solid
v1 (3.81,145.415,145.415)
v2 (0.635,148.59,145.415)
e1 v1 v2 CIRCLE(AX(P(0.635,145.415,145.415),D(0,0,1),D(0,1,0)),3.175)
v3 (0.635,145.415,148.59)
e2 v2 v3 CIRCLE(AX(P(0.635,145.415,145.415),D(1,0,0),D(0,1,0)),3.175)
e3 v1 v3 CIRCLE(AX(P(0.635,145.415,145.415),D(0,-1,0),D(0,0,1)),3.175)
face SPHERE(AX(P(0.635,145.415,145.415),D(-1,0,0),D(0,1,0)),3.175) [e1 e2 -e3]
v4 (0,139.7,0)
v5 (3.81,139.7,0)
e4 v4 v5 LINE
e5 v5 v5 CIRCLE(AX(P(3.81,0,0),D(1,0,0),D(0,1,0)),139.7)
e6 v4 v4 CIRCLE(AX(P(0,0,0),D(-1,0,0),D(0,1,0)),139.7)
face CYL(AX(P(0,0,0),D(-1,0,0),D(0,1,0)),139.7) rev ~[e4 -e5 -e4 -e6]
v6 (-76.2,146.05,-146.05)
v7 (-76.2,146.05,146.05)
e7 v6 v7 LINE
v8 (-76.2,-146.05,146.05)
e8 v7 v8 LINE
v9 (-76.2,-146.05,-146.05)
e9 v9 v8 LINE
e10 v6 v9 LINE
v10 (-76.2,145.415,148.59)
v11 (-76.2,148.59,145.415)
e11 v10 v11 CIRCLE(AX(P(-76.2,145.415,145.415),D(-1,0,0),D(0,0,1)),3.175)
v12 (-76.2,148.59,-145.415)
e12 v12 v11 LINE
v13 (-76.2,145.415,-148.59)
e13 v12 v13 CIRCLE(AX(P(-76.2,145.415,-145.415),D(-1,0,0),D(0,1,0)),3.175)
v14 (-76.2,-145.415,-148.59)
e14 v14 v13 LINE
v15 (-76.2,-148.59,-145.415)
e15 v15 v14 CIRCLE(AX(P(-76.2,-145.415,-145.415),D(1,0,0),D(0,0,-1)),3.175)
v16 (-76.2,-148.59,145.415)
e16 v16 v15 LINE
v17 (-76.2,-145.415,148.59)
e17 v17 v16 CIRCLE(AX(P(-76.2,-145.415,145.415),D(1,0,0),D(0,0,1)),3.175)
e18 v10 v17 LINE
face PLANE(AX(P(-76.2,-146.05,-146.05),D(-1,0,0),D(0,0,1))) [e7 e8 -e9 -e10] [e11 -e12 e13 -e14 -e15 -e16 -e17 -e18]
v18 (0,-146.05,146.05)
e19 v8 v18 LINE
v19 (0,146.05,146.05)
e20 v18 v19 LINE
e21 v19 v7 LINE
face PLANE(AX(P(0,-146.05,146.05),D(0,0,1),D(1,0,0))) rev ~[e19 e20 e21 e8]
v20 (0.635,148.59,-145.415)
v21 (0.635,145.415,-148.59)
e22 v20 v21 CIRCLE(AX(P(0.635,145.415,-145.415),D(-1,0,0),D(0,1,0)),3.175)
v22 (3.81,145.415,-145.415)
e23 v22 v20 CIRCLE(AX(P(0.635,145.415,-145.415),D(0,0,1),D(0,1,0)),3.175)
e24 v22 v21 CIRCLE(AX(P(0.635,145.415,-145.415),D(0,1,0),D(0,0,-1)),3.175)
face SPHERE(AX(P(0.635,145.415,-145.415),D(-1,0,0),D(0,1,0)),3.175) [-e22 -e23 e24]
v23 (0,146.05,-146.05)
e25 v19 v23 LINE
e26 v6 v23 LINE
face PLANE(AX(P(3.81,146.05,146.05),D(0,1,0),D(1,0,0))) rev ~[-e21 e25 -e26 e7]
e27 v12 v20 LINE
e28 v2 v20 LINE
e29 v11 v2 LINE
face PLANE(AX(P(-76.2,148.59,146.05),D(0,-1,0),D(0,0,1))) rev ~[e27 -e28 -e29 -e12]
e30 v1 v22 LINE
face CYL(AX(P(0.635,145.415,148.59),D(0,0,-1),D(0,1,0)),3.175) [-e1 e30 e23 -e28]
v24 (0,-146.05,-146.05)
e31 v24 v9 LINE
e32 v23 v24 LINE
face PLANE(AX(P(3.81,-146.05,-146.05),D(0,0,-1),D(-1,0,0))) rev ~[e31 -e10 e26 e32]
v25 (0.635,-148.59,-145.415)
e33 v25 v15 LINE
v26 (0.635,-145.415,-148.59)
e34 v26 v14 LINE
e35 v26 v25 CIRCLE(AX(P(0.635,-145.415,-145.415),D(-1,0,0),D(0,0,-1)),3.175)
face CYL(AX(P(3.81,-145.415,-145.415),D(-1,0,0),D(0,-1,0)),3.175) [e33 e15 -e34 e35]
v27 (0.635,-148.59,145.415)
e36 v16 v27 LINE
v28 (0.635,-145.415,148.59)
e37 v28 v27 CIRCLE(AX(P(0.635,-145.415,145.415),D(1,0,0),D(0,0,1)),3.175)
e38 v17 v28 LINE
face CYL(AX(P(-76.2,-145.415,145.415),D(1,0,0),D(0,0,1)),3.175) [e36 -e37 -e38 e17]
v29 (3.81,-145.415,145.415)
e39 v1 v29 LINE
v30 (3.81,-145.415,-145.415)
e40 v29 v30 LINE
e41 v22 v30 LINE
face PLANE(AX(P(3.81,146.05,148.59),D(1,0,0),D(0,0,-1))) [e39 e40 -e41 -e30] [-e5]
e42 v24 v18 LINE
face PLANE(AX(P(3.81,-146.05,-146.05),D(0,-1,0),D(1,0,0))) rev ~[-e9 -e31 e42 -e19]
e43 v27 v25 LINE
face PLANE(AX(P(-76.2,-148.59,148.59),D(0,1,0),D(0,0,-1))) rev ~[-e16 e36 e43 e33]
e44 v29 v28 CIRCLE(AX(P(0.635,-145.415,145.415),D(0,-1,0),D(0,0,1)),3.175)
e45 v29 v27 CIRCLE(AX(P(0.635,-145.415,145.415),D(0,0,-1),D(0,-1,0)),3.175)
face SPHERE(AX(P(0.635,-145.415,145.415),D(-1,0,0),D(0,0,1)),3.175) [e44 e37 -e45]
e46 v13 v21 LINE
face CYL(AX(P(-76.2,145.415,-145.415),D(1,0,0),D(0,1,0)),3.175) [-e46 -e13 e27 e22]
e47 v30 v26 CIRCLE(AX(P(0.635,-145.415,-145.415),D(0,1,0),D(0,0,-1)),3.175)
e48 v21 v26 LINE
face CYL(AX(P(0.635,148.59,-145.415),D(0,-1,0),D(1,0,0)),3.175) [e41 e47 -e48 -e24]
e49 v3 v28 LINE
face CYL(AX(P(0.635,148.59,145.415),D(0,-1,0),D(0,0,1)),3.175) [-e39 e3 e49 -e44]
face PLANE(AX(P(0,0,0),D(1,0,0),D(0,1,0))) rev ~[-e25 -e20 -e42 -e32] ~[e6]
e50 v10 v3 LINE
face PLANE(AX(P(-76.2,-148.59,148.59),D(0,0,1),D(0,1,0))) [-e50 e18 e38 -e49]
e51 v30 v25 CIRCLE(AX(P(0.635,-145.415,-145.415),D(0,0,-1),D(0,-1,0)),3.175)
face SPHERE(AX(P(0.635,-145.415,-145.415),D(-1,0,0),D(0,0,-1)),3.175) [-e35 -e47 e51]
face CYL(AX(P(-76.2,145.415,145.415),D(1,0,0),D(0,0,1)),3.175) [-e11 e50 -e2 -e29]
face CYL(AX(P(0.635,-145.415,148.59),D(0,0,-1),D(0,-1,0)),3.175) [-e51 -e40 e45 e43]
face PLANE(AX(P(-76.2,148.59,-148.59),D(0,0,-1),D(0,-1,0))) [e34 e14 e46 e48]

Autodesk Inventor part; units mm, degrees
ref_plane "YZ Plane" through (0, 0, 0) normal (1, 0, 0) x (0, 1, 0)
ref_plane "XZ Plane" through (0, 0, 0) normal (0, 1, 0) x (-1, 0, 0)
ref_plane "XY Plane" through (0, 0, 0) normal (0, 0, 1) x (1, 0, 0)
sketch "Sketch1" plane through (0, 0, 0) normal (1, 0, 0) x (0, 1, 0)
  circle A0 centre (0, 0) radius 139.7
  line L0 (0, -139.7) -> (0, -146.05)
  line L1 (-139.7, 0) -> (-146.05, 0)
  line L2 (146.05, 0) -> (146.05, -146.05)
  line L3 (146.05, -146.05) -> (-146.05, -146.05)
  line L4 (-146.05, -146.05) -> (-146.05, 146.05)
  line L5 (-146.05, 146.05) -> (146.05, 146.05)
  line L6 (146.05, 146.05) -> (146.05, 0)
  dimension "d1" = 279.4
sketch "Sketch2" plane through (0, 0, 0) normal (0, 0, 1) x (1, 0, 0)
  point P0 (0, 0)
extrude "Extrusion1" add sketch "Sketch1" along normal blind 3.81 contours A0 L1 L4 L5 L6 L2 L3 L0 | A0 L0 L3 L4 L1
sketch "Sketch3" plane through (0, -146.05, 146.05) normal (0, 0, 1) x (1, 0, 0)
  line L0 (0, 292.1) -> (0, 0) projected
  line L1 (3.81, 292.1) -> (-76.2, 292.1)
  line L2 (-76.2, 292.1) -> (-76.2, 0)
  line L3 (-76.2, 0) -> (3.81, 0)
  point P0 (0, 146.05)
  dimension "d12" = 80.01
extrude "Extrusion3" add sketch "Sketch3" along normal blind 2.54
sketch "Sketch4" plane through (3.81, -146.05, -146.05) normal (0, -1, 0) x (1, 0, 0)
  line L0 (-3.81, 292.1) -> (0, 292.1) projected
  line L1 (-3.81, 292.1) -> (-80.01, 292.1) projected
  line L2 (-3.81, 292.1) -> (-80.01, 292.1)
  line L3 (-3.81, 292.1) -> (-3.81, 0) projected
  line L4 (-3.81, 0) -> (-80.01, 0)
  line L5 (-80.01, 0) -> (-80.01, 292.1)
  point P0 (-3.81, 146.05)
  dimension "d15" = 76.2
extrude "Extrusion4" add sketch "Sketch4" along normal blind 2.54
sketch "Sketch6" plane through (3.81, -146.05, -146.05) normal (0, 0, -1) x (-1, 0, 0)
  line L0 (80.01, 0) -> (3.81, 0) projected
  line L1 (3.81, 0) -> (80.01, 0)
  line L2 (80.01, 292.1) -> (80.01, 0) projected
  line L3 (80.01, 0) -> (80.01, 292.1)
  line L4 (80.01, 292.1) -> (3.81, 292.1)
  line L5 (3.81, 292.1) -> (3.81, 0)
  line L6 (3.81, 6.35) -> (3.81, 285.75) projected
  point P0 (3.81, 146.05)
extrude "Extrusion5" add sketch "Sketch6" along normal blind 2.54
sketch "Sketch7" plane through (3.81, 146.05, 146.05) normal (0, 1, 0) x (1, 0, 0)
  line L0 (-3.81, 292.1) -> (0, 292.1) projected
  line L1 (-3.81, 292.1) -> (-80.01, 292.1)
  line L2 (-80.01, 292.1) -> (-80.01, 0)
  line L3 (-80.01, 0) -> (-3.81, 0)
  line L4 (-3.81, 292.1) -> (-3.81, 0)
  point P0 (-3.81, 146.05)
extrude "Extrusion6" add sketch "Sketch7" along normal blind 2.54
sketch "Sketch21" plane through (-76.2, -148.59, -146.05) normal (-1, 0, 0) x (0, 0, 1)
  line L0 (0, 0) -> (-2.54, 0)
  line L1 (-2.54, 0) -> (-2.54, 2.54)
  line L2 (0, 2.54) -> (-2.54, 2.54) projected
  line L3 (-2.54, 2.54) -> (0, 2.54)
  line L4 (0, 2.54) -> (0, 0) projected
  line L5 (0, 2.54) -> (0, 0)
  point P0 (146.05, 148.59)
extrude "Extrusion16" add sketch "Sketch21" against normal up to surface (76.2 mm away)
sketch "Sketch22" plane through (3.81, 148.59, 146.05) normal (0, 1, 0) x (1, 0, 0)
  line L0 (-3.81, 0) -> (-3.81, 294.64) projected
  line L1 (-80.01, 292.1) -> (-3.81, 292.1) projected
  line L2 (-3.81, 294.64) -> (-3.81, 292.1)
  line L3 (0, 292.1) -> (0, 0) projected
  line L4 (-3.81, 292.1) -> (0, 292.1)
  line L5 (0, 292.1) -> (0, 294.64)
  line L6 (0, 294.64) -> (-3.81, 294.64)
  point P0 (-3.81, 146.05)
extrude "Extrusion17" add sketch "Sketch22" against normal up to surface (297.18 mm away)
sketch "Sketch23" plane through (-76.2, -146.05, -146.05) normal (-1, 0, 0) x (0, 0, 1)
  line L0 (0, 292.1) -> (-2.54, 292.1) projected
  line L1 (-2.54, 292.1) -> (0, 292.1)
  line L2 (292.1, 294.64) -> (0, 294.64) projected
  line L3 (0, 292.1) -> (0, 294.64)
  line L4 (-2.54, 294.64) -> (-2.54, -2.54) projected
  line L5 (0, 294.64) -> (-2.54, 294.64)
  line L6 (-2.54, 294.64) -> (-2.54, 292.1)
  point P0 (146.05, 146.05)
extrude "Extrusion18" add sketch "Sketch23" against normal up to surface (76.2 mm away)
sketch "Sketch26" plane through (0, -146.05, 148.59) normal (0, 0, 1) x (1, 0, 0)
  line L0 (0, 292.1) -> (3.81, 292.1) projected
  line L1 (3.81, 292.1) -> (0, 292.1)
  line L2 (0, 292.1) -> (0, 294.64) projected
  line L3 (0, 292.1) -> (0, 294.64)
  line L4 (0, 294.64) -> (3.81, 294.64)
  line L5 (3.81, 294.64) -> (3.81, 292.1)
  point P0 (0, 146.05)
extrude "Extrusion20" add sketch "Sketch26" against normal up to surface (294.64 mm away)
sketch "Sketch27" plane through (0, -146.05, 148.59) normal (0, 0, 1) x (1, 0, 0)
  line L0 (0, 0) -> (3.81, 0) projected
  line L1 (3.81, 0) -> (0, 0)
  line L2 (0, 0) -> (0, -2.54) projected
  line L3 (0, 0) -> (0, -2.54)
  line L4 (0, -2.54) -> (3.81, -2.54) projected
  line L5 (0, -2.54) -> (3.81, -2.54)
  line L6 (3.81, 0) -> (3.81, -2.54) projected
  line L7 (3.81, -2.54) -> (3.81, 0)
  point P0 (0, 146.05)
extrude "Extrusion21" add sketch "Sketch27" against normal up to surface (294.64 mm away)
sketch "Sketch28" plane through (0, 146.05, 148.59) normal (0, -1, 0) x (1, 0, 0)
  line L0 (3.81, 0) -> (3.81, -2.54) projected
  line L1 (3.81, 0) -> (3.81, -2.54)
  line L2 (3.81, -2.54) -> (0, -2.54)
  line L3 (0, -2.54) -> (0, 0)
  line L4 (0, 0) -> (3.81, 0)
  point P0 (0, -148.59)
extrude "Extrusion22" add sketch "Sketch28" along normal up to surface (292.1 mm away)
sketch "Sketch29" plane through (-76.2, -146.05, -146.05) normal (-1, 0, 0) x (0, 0, 1)
  line L0 (292.1, 292.1) -> (294.64, 292.1) projected
  line L1 (294.64, 292.1) -> (292.1, 292.1)
  line L2 (292.1, 292.1) -> (292.1, 294.64) projected
  line L3 (292.1, 292.1) -> (292.1, 294.64)
  line L4 (294.64, 294.64) -> (294.64, 292.1) projected
  line L5 (292.1, 294.64) -> (294.64, 294.64)
  line L6 (294.64, 294.64) -> (294.64, 292.1)
  point P0 (146.05, 146.05)
extrude "Extrusion23" add sketch "Sketch29" against normal up to surface (76.2 mm away)
sketch "Sketch30" plane through (-76.2, -146.05, -146.05) normal (-1, 0, 0) x (0, 0, 1)
  line L0 (292.1, 0) -> (0, 0) projected
  line L1 (292.1, 0) -> (292.1, -2.54)
  line L2 (294.64, -2.54) -> (-2.54, -2.54) projected
  line L3 (294.64, -2.54) -> (294.64, 0)
  line L4 (294.64, -2.54) -> (294.64, 294.64) projected
  line L5 (292.1, 0) -> (294.64, 0)
  line L6 (292.1, 0) -> (292.1, -2.54) projected
  line L7 (292.1, -2.54) -> (294.64, -2.54)
  point P0 (146.05, 146.05)
extrude "Extrusion24" add sketch "Sketch30" against normal up to surface (76.2 mm away)
fillet "Fillet1" radius 3.175 8 edges at (-36.195, -148.59, 148.59) (-36.195, -148.59, -148.59) (-36.195, 148.59, -148.59) (-36.195, 148.59, 148.59) (3.81, 148.59, 0) (3.81, 0, 148.59) (3.81, 0, -148.59) (3.81, -148.59, 0)
properties part number "Base box"
